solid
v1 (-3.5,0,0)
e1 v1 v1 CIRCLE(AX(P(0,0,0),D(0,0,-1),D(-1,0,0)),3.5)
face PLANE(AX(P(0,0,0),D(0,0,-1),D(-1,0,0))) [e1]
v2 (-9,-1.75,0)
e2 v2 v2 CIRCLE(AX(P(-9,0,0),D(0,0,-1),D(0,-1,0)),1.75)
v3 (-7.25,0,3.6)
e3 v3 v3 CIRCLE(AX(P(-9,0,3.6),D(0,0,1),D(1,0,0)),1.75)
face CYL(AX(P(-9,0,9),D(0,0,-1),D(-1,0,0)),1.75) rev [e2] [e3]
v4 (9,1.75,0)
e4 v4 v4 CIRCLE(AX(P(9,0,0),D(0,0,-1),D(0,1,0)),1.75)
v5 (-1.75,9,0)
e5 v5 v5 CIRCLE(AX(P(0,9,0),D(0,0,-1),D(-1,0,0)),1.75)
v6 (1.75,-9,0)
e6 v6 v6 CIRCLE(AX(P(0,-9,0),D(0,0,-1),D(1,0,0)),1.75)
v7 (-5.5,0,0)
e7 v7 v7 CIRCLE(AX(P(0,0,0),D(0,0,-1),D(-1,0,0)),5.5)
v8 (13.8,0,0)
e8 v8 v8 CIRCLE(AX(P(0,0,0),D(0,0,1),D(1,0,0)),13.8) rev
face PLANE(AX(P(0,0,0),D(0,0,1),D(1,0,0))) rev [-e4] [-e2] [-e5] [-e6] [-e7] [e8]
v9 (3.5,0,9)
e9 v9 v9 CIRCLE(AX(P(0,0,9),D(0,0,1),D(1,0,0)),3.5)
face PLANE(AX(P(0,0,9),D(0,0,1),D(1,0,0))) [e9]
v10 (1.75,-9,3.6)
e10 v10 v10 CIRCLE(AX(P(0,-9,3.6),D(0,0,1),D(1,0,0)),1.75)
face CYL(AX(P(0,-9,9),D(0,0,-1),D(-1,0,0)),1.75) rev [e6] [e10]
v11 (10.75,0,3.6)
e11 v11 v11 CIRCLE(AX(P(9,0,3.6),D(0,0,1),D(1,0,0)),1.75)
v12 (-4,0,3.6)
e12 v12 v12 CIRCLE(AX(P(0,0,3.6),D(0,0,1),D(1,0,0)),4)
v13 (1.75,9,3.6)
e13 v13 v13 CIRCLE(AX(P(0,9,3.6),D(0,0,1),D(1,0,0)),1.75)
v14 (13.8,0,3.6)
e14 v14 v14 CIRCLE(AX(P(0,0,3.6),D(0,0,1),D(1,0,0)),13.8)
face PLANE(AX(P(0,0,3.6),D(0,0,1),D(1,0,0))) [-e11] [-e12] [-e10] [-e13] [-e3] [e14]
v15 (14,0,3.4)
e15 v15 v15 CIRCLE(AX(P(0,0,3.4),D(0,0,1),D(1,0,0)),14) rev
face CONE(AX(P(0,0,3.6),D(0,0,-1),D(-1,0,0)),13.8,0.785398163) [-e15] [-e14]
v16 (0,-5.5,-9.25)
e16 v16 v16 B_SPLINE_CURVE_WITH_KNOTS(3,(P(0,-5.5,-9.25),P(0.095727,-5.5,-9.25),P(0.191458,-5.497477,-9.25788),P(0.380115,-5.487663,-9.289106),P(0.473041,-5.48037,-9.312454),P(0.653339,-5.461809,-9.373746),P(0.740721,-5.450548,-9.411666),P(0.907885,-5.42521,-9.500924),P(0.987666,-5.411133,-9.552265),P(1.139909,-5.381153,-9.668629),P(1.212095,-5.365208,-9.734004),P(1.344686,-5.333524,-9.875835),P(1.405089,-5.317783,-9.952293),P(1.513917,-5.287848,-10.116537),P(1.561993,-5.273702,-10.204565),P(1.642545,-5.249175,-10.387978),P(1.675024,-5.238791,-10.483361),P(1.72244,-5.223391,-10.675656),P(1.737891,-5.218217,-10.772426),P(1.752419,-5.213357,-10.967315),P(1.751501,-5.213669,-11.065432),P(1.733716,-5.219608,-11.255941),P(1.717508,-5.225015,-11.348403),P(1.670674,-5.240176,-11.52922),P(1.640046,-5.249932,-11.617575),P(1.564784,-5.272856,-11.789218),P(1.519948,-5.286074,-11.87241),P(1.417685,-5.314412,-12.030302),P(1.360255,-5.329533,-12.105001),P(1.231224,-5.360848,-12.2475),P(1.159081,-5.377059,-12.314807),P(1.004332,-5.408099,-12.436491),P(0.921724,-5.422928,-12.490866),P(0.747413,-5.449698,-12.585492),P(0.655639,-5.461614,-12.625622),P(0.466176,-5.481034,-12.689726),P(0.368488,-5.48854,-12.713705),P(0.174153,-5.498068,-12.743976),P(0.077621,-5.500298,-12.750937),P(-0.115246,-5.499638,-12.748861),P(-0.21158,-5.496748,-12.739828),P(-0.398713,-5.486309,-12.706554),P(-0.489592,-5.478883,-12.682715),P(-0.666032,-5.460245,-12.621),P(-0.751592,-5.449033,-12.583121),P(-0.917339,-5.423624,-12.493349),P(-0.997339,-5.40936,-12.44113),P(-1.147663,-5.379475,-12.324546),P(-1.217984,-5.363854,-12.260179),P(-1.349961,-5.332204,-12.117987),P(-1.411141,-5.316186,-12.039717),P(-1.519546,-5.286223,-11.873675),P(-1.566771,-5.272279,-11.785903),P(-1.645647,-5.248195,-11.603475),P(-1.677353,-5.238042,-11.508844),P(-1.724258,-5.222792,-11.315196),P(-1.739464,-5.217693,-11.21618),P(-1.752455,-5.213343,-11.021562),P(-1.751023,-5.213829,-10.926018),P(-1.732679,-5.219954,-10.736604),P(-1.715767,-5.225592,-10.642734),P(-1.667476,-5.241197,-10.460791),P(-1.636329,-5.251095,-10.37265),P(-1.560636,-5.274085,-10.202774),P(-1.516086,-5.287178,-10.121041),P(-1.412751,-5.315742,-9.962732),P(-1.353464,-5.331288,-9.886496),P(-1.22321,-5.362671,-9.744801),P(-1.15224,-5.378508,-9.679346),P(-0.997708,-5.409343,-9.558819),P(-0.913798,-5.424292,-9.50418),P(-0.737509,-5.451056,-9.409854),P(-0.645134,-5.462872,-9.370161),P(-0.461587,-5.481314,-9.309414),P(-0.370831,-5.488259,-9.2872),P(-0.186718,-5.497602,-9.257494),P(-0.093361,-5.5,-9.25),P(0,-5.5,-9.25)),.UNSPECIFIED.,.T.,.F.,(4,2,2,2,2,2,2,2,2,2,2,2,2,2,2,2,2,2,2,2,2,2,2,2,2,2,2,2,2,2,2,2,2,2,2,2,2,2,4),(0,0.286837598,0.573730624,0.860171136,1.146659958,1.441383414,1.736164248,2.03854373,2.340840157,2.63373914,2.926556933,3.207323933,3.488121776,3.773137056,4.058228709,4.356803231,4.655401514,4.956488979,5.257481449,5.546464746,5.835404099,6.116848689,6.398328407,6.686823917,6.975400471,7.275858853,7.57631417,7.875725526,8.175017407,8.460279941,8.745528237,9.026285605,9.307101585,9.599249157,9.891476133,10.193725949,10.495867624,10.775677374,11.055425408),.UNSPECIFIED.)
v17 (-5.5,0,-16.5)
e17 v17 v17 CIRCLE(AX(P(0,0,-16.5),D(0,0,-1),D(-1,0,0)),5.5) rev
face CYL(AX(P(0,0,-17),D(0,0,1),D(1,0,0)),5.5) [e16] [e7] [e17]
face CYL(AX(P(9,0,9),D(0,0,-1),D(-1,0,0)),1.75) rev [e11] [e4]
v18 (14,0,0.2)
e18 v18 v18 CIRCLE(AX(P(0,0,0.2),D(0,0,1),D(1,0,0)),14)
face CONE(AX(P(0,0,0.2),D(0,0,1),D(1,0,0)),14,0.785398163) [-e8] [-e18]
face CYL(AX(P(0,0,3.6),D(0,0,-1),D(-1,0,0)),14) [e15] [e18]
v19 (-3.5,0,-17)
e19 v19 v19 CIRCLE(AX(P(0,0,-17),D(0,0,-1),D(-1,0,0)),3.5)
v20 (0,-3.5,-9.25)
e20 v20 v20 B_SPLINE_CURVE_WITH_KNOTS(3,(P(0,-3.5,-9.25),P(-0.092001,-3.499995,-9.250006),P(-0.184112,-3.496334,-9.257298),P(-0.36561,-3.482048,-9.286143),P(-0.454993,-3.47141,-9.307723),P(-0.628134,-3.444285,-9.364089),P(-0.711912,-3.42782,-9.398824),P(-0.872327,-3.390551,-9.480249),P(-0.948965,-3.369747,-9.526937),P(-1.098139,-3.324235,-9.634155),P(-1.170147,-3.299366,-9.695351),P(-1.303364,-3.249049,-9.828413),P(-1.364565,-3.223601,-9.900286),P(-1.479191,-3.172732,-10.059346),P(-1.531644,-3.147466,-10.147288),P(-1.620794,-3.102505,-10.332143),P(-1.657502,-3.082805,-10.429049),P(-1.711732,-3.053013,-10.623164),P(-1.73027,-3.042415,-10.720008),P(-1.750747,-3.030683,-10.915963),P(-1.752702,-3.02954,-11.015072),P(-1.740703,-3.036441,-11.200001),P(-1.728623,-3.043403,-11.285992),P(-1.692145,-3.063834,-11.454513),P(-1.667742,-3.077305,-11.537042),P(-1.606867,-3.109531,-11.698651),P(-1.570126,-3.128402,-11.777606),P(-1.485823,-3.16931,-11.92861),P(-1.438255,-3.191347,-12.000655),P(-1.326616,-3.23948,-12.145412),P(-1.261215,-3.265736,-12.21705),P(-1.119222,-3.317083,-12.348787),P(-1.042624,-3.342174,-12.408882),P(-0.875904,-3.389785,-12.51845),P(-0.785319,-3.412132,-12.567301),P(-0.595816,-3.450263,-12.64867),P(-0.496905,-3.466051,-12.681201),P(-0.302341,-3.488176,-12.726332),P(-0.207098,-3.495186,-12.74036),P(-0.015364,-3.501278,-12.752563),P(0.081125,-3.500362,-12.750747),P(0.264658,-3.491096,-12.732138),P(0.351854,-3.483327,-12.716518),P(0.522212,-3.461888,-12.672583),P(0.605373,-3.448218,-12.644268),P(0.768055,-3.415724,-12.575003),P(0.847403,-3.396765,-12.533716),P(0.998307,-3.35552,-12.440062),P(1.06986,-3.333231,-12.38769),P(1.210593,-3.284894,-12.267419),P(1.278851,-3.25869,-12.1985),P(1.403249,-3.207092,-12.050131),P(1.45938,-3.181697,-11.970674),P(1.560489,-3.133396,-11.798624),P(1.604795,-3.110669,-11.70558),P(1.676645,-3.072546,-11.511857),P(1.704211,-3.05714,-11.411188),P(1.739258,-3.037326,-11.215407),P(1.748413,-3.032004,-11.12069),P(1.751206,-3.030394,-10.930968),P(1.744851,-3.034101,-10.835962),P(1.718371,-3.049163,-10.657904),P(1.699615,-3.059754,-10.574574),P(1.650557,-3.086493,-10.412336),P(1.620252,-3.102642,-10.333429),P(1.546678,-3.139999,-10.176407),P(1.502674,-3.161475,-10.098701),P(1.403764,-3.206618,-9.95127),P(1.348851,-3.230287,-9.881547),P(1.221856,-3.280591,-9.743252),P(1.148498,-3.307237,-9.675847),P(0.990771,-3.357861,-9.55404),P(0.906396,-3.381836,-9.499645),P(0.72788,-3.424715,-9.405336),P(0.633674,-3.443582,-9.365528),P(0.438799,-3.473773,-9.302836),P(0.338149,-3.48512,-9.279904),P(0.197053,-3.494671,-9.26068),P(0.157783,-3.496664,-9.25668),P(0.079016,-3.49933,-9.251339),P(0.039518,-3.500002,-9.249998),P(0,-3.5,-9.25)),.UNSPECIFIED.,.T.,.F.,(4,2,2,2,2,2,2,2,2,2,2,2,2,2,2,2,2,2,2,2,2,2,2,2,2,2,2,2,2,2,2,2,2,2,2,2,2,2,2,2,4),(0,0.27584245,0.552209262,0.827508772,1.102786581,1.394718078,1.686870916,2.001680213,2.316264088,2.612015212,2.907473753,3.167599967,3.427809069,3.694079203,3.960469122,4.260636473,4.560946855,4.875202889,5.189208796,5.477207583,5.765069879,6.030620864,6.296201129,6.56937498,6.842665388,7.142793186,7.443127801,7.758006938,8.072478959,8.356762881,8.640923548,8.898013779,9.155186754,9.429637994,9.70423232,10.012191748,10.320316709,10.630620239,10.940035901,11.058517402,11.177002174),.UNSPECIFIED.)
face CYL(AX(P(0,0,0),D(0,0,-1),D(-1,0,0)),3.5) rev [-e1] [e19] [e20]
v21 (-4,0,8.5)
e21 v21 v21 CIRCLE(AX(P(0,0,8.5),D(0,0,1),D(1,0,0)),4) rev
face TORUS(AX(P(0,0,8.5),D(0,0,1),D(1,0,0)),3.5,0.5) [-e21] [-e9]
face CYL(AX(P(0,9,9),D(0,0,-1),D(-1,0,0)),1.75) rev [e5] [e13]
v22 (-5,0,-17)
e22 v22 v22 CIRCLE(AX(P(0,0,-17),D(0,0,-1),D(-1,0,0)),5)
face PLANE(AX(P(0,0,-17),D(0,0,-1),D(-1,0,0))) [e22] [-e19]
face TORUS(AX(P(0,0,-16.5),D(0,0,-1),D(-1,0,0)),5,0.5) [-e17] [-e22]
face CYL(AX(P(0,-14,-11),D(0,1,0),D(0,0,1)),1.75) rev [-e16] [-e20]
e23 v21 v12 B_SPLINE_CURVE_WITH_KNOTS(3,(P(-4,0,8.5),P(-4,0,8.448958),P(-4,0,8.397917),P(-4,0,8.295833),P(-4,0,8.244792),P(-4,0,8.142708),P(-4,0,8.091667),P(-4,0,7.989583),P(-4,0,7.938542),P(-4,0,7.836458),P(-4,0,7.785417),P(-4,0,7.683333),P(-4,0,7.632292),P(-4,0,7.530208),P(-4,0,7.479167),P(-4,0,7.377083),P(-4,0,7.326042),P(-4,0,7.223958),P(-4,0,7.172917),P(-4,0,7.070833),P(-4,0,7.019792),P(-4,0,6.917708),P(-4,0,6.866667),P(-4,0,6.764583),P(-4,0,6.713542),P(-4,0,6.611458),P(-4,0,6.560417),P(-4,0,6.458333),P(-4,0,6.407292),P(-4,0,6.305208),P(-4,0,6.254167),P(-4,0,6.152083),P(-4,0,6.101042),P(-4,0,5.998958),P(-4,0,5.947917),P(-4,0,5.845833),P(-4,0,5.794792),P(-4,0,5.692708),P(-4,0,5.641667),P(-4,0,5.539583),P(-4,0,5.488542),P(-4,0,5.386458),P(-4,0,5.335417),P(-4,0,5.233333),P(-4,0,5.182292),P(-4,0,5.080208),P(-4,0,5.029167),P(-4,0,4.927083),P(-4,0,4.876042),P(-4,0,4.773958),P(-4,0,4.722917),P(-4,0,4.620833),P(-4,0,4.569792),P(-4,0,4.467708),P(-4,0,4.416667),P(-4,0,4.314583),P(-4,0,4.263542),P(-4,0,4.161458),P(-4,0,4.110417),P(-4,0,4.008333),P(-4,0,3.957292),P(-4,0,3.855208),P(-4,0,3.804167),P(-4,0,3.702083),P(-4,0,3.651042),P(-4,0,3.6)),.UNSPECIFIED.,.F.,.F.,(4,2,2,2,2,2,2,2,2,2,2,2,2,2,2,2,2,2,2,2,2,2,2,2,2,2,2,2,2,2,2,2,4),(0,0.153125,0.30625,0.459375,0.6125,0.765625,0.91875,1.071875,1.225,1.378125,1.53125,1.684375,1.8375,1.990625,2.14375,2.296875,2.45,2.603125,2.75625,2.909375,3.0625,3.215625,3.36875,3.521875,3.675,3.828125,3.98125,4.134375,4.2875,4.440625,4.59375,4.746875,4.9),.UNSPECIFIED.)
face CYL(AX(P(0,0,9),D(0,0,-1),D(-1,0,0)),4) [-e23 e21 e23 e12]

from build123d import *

# Parameters (mm, degrees)
SKETCH1_R           = 14
BOSS_EXTRUDE1_DEPTH = 3.6
SKETCH2_R           = 4
BOSS_EXTRUDE2_DEPTH = 5.4
SKETCH3_R           = 5.5
BOSS_EXTRUDE3_DEPTH = 17
SKETCH4_R           = 3.5
CUT_EXTRUDE1_DEPTH  = 17
SKETCH5_R           = 1.75
CUT_EXTRUDE2_DEPTH  = 27.095976701
CIRPATTERN1_COUNT   = 4
SKETCH6_R           = 1.75
CUT_EXTRUDE3_DEPTH  = 27.095976701
FILLET1_R           = 0.5
FILLET2_SIZE        = 0.2


with BuildPart() as part:
    # Sketch1 → Boss-Extrude1 (new body)
    with BuildSketch(Plane.XY):
        Circle(SKETCH1_R)
    extrude(amount=BOSS_EXTRUDE1_DEPTH)

    # Sketch2 → Boss-Extrude2 (add)
    with BuildSketch(Plane.XY.offset(3.6)):
        Circle(SKETCH2_R)
    extrude(amount=BOSS_EXTRUDE2_DEPTH)

    # Sketch3 → Boss-Extrude3 (add)
    with BuildSketch(Plane(origin=(0, 0, 0), x_dir=(-1, 0, 0), z_dir=(0, 0, -1))):
        Circle(SKETCH3_R)
    extrude(amount=BOSS_EXTRUDE3_DEPTH)

    # Sketch4 → Cut-Extrude1 (cut)
    with BuildSketch(Plane(origin=(0, 0, -17), x_dir=(-1, 0, 0), z_dir=(0, 0, -1))):
        Circle(SKETCH4_R)
    extrude(amount=-CUT_EXTRUDE1_DEPTH, mode=Mode.SUBTRACT)

    # Sketch5 → Cut-Extrude2 (cut, through all)
    with BuildSketch(Plane(origin=(0, 0, 0), x_dir=(-1, 0, 0), z_dir=(0, 0, -1))):
        with Locations((0, 9)):
            Circle(SKETCH5_R)
    cut_extrude2 = extrude(amount=-CUT_EXTRUDE2_DEPTH, mode=Mode.SUBTRACT)

    # CirPattern1: Cut-Extrude2 ×4 about axis
    cirpattern1_axis = Axis((0, 0, 0), (0, 0, -1))
    for i in range(1, CIRPATTERN1_COUNT):
        add(cut_extrude2.rotate(cirpattern1_axis, i * 360 / CIRPATTERN1_COUNT), mode=Mode.SUBTRACT)

    # Sketch6 → Cut-Extrude3 (cut, through all)
    with BuildSketch(Plane(origin=(0, 0, 0), x_dir=(1, 0, 0), z_dir=(0, 1, 0))):
        with Locations((0, 11)):
            Circle(SKETCH6_R)
    extrude(amount=-CUT_EXTRUDE3_DEPTH, mode=Mode.SUBTRACT)

    # Fillet1
    fillet1_edges = [part.edges().sort_by_distance(p)[0] for p in [
        (5.5, 0, -17),
        (-4, 0, 9),
    ]]
    fillet(fillet1_edges, radius=FILLET1_R)

    # Fillet2
    fillet2_edges = [part.edges().sort_by_distance(p)[0] for p in [
        (-14, 0, 0),
        (-14, 0, 3.6),
    ]]
    chamfer(fillet2_edges, length=FILLET2_SIZE)


solid = part.part
